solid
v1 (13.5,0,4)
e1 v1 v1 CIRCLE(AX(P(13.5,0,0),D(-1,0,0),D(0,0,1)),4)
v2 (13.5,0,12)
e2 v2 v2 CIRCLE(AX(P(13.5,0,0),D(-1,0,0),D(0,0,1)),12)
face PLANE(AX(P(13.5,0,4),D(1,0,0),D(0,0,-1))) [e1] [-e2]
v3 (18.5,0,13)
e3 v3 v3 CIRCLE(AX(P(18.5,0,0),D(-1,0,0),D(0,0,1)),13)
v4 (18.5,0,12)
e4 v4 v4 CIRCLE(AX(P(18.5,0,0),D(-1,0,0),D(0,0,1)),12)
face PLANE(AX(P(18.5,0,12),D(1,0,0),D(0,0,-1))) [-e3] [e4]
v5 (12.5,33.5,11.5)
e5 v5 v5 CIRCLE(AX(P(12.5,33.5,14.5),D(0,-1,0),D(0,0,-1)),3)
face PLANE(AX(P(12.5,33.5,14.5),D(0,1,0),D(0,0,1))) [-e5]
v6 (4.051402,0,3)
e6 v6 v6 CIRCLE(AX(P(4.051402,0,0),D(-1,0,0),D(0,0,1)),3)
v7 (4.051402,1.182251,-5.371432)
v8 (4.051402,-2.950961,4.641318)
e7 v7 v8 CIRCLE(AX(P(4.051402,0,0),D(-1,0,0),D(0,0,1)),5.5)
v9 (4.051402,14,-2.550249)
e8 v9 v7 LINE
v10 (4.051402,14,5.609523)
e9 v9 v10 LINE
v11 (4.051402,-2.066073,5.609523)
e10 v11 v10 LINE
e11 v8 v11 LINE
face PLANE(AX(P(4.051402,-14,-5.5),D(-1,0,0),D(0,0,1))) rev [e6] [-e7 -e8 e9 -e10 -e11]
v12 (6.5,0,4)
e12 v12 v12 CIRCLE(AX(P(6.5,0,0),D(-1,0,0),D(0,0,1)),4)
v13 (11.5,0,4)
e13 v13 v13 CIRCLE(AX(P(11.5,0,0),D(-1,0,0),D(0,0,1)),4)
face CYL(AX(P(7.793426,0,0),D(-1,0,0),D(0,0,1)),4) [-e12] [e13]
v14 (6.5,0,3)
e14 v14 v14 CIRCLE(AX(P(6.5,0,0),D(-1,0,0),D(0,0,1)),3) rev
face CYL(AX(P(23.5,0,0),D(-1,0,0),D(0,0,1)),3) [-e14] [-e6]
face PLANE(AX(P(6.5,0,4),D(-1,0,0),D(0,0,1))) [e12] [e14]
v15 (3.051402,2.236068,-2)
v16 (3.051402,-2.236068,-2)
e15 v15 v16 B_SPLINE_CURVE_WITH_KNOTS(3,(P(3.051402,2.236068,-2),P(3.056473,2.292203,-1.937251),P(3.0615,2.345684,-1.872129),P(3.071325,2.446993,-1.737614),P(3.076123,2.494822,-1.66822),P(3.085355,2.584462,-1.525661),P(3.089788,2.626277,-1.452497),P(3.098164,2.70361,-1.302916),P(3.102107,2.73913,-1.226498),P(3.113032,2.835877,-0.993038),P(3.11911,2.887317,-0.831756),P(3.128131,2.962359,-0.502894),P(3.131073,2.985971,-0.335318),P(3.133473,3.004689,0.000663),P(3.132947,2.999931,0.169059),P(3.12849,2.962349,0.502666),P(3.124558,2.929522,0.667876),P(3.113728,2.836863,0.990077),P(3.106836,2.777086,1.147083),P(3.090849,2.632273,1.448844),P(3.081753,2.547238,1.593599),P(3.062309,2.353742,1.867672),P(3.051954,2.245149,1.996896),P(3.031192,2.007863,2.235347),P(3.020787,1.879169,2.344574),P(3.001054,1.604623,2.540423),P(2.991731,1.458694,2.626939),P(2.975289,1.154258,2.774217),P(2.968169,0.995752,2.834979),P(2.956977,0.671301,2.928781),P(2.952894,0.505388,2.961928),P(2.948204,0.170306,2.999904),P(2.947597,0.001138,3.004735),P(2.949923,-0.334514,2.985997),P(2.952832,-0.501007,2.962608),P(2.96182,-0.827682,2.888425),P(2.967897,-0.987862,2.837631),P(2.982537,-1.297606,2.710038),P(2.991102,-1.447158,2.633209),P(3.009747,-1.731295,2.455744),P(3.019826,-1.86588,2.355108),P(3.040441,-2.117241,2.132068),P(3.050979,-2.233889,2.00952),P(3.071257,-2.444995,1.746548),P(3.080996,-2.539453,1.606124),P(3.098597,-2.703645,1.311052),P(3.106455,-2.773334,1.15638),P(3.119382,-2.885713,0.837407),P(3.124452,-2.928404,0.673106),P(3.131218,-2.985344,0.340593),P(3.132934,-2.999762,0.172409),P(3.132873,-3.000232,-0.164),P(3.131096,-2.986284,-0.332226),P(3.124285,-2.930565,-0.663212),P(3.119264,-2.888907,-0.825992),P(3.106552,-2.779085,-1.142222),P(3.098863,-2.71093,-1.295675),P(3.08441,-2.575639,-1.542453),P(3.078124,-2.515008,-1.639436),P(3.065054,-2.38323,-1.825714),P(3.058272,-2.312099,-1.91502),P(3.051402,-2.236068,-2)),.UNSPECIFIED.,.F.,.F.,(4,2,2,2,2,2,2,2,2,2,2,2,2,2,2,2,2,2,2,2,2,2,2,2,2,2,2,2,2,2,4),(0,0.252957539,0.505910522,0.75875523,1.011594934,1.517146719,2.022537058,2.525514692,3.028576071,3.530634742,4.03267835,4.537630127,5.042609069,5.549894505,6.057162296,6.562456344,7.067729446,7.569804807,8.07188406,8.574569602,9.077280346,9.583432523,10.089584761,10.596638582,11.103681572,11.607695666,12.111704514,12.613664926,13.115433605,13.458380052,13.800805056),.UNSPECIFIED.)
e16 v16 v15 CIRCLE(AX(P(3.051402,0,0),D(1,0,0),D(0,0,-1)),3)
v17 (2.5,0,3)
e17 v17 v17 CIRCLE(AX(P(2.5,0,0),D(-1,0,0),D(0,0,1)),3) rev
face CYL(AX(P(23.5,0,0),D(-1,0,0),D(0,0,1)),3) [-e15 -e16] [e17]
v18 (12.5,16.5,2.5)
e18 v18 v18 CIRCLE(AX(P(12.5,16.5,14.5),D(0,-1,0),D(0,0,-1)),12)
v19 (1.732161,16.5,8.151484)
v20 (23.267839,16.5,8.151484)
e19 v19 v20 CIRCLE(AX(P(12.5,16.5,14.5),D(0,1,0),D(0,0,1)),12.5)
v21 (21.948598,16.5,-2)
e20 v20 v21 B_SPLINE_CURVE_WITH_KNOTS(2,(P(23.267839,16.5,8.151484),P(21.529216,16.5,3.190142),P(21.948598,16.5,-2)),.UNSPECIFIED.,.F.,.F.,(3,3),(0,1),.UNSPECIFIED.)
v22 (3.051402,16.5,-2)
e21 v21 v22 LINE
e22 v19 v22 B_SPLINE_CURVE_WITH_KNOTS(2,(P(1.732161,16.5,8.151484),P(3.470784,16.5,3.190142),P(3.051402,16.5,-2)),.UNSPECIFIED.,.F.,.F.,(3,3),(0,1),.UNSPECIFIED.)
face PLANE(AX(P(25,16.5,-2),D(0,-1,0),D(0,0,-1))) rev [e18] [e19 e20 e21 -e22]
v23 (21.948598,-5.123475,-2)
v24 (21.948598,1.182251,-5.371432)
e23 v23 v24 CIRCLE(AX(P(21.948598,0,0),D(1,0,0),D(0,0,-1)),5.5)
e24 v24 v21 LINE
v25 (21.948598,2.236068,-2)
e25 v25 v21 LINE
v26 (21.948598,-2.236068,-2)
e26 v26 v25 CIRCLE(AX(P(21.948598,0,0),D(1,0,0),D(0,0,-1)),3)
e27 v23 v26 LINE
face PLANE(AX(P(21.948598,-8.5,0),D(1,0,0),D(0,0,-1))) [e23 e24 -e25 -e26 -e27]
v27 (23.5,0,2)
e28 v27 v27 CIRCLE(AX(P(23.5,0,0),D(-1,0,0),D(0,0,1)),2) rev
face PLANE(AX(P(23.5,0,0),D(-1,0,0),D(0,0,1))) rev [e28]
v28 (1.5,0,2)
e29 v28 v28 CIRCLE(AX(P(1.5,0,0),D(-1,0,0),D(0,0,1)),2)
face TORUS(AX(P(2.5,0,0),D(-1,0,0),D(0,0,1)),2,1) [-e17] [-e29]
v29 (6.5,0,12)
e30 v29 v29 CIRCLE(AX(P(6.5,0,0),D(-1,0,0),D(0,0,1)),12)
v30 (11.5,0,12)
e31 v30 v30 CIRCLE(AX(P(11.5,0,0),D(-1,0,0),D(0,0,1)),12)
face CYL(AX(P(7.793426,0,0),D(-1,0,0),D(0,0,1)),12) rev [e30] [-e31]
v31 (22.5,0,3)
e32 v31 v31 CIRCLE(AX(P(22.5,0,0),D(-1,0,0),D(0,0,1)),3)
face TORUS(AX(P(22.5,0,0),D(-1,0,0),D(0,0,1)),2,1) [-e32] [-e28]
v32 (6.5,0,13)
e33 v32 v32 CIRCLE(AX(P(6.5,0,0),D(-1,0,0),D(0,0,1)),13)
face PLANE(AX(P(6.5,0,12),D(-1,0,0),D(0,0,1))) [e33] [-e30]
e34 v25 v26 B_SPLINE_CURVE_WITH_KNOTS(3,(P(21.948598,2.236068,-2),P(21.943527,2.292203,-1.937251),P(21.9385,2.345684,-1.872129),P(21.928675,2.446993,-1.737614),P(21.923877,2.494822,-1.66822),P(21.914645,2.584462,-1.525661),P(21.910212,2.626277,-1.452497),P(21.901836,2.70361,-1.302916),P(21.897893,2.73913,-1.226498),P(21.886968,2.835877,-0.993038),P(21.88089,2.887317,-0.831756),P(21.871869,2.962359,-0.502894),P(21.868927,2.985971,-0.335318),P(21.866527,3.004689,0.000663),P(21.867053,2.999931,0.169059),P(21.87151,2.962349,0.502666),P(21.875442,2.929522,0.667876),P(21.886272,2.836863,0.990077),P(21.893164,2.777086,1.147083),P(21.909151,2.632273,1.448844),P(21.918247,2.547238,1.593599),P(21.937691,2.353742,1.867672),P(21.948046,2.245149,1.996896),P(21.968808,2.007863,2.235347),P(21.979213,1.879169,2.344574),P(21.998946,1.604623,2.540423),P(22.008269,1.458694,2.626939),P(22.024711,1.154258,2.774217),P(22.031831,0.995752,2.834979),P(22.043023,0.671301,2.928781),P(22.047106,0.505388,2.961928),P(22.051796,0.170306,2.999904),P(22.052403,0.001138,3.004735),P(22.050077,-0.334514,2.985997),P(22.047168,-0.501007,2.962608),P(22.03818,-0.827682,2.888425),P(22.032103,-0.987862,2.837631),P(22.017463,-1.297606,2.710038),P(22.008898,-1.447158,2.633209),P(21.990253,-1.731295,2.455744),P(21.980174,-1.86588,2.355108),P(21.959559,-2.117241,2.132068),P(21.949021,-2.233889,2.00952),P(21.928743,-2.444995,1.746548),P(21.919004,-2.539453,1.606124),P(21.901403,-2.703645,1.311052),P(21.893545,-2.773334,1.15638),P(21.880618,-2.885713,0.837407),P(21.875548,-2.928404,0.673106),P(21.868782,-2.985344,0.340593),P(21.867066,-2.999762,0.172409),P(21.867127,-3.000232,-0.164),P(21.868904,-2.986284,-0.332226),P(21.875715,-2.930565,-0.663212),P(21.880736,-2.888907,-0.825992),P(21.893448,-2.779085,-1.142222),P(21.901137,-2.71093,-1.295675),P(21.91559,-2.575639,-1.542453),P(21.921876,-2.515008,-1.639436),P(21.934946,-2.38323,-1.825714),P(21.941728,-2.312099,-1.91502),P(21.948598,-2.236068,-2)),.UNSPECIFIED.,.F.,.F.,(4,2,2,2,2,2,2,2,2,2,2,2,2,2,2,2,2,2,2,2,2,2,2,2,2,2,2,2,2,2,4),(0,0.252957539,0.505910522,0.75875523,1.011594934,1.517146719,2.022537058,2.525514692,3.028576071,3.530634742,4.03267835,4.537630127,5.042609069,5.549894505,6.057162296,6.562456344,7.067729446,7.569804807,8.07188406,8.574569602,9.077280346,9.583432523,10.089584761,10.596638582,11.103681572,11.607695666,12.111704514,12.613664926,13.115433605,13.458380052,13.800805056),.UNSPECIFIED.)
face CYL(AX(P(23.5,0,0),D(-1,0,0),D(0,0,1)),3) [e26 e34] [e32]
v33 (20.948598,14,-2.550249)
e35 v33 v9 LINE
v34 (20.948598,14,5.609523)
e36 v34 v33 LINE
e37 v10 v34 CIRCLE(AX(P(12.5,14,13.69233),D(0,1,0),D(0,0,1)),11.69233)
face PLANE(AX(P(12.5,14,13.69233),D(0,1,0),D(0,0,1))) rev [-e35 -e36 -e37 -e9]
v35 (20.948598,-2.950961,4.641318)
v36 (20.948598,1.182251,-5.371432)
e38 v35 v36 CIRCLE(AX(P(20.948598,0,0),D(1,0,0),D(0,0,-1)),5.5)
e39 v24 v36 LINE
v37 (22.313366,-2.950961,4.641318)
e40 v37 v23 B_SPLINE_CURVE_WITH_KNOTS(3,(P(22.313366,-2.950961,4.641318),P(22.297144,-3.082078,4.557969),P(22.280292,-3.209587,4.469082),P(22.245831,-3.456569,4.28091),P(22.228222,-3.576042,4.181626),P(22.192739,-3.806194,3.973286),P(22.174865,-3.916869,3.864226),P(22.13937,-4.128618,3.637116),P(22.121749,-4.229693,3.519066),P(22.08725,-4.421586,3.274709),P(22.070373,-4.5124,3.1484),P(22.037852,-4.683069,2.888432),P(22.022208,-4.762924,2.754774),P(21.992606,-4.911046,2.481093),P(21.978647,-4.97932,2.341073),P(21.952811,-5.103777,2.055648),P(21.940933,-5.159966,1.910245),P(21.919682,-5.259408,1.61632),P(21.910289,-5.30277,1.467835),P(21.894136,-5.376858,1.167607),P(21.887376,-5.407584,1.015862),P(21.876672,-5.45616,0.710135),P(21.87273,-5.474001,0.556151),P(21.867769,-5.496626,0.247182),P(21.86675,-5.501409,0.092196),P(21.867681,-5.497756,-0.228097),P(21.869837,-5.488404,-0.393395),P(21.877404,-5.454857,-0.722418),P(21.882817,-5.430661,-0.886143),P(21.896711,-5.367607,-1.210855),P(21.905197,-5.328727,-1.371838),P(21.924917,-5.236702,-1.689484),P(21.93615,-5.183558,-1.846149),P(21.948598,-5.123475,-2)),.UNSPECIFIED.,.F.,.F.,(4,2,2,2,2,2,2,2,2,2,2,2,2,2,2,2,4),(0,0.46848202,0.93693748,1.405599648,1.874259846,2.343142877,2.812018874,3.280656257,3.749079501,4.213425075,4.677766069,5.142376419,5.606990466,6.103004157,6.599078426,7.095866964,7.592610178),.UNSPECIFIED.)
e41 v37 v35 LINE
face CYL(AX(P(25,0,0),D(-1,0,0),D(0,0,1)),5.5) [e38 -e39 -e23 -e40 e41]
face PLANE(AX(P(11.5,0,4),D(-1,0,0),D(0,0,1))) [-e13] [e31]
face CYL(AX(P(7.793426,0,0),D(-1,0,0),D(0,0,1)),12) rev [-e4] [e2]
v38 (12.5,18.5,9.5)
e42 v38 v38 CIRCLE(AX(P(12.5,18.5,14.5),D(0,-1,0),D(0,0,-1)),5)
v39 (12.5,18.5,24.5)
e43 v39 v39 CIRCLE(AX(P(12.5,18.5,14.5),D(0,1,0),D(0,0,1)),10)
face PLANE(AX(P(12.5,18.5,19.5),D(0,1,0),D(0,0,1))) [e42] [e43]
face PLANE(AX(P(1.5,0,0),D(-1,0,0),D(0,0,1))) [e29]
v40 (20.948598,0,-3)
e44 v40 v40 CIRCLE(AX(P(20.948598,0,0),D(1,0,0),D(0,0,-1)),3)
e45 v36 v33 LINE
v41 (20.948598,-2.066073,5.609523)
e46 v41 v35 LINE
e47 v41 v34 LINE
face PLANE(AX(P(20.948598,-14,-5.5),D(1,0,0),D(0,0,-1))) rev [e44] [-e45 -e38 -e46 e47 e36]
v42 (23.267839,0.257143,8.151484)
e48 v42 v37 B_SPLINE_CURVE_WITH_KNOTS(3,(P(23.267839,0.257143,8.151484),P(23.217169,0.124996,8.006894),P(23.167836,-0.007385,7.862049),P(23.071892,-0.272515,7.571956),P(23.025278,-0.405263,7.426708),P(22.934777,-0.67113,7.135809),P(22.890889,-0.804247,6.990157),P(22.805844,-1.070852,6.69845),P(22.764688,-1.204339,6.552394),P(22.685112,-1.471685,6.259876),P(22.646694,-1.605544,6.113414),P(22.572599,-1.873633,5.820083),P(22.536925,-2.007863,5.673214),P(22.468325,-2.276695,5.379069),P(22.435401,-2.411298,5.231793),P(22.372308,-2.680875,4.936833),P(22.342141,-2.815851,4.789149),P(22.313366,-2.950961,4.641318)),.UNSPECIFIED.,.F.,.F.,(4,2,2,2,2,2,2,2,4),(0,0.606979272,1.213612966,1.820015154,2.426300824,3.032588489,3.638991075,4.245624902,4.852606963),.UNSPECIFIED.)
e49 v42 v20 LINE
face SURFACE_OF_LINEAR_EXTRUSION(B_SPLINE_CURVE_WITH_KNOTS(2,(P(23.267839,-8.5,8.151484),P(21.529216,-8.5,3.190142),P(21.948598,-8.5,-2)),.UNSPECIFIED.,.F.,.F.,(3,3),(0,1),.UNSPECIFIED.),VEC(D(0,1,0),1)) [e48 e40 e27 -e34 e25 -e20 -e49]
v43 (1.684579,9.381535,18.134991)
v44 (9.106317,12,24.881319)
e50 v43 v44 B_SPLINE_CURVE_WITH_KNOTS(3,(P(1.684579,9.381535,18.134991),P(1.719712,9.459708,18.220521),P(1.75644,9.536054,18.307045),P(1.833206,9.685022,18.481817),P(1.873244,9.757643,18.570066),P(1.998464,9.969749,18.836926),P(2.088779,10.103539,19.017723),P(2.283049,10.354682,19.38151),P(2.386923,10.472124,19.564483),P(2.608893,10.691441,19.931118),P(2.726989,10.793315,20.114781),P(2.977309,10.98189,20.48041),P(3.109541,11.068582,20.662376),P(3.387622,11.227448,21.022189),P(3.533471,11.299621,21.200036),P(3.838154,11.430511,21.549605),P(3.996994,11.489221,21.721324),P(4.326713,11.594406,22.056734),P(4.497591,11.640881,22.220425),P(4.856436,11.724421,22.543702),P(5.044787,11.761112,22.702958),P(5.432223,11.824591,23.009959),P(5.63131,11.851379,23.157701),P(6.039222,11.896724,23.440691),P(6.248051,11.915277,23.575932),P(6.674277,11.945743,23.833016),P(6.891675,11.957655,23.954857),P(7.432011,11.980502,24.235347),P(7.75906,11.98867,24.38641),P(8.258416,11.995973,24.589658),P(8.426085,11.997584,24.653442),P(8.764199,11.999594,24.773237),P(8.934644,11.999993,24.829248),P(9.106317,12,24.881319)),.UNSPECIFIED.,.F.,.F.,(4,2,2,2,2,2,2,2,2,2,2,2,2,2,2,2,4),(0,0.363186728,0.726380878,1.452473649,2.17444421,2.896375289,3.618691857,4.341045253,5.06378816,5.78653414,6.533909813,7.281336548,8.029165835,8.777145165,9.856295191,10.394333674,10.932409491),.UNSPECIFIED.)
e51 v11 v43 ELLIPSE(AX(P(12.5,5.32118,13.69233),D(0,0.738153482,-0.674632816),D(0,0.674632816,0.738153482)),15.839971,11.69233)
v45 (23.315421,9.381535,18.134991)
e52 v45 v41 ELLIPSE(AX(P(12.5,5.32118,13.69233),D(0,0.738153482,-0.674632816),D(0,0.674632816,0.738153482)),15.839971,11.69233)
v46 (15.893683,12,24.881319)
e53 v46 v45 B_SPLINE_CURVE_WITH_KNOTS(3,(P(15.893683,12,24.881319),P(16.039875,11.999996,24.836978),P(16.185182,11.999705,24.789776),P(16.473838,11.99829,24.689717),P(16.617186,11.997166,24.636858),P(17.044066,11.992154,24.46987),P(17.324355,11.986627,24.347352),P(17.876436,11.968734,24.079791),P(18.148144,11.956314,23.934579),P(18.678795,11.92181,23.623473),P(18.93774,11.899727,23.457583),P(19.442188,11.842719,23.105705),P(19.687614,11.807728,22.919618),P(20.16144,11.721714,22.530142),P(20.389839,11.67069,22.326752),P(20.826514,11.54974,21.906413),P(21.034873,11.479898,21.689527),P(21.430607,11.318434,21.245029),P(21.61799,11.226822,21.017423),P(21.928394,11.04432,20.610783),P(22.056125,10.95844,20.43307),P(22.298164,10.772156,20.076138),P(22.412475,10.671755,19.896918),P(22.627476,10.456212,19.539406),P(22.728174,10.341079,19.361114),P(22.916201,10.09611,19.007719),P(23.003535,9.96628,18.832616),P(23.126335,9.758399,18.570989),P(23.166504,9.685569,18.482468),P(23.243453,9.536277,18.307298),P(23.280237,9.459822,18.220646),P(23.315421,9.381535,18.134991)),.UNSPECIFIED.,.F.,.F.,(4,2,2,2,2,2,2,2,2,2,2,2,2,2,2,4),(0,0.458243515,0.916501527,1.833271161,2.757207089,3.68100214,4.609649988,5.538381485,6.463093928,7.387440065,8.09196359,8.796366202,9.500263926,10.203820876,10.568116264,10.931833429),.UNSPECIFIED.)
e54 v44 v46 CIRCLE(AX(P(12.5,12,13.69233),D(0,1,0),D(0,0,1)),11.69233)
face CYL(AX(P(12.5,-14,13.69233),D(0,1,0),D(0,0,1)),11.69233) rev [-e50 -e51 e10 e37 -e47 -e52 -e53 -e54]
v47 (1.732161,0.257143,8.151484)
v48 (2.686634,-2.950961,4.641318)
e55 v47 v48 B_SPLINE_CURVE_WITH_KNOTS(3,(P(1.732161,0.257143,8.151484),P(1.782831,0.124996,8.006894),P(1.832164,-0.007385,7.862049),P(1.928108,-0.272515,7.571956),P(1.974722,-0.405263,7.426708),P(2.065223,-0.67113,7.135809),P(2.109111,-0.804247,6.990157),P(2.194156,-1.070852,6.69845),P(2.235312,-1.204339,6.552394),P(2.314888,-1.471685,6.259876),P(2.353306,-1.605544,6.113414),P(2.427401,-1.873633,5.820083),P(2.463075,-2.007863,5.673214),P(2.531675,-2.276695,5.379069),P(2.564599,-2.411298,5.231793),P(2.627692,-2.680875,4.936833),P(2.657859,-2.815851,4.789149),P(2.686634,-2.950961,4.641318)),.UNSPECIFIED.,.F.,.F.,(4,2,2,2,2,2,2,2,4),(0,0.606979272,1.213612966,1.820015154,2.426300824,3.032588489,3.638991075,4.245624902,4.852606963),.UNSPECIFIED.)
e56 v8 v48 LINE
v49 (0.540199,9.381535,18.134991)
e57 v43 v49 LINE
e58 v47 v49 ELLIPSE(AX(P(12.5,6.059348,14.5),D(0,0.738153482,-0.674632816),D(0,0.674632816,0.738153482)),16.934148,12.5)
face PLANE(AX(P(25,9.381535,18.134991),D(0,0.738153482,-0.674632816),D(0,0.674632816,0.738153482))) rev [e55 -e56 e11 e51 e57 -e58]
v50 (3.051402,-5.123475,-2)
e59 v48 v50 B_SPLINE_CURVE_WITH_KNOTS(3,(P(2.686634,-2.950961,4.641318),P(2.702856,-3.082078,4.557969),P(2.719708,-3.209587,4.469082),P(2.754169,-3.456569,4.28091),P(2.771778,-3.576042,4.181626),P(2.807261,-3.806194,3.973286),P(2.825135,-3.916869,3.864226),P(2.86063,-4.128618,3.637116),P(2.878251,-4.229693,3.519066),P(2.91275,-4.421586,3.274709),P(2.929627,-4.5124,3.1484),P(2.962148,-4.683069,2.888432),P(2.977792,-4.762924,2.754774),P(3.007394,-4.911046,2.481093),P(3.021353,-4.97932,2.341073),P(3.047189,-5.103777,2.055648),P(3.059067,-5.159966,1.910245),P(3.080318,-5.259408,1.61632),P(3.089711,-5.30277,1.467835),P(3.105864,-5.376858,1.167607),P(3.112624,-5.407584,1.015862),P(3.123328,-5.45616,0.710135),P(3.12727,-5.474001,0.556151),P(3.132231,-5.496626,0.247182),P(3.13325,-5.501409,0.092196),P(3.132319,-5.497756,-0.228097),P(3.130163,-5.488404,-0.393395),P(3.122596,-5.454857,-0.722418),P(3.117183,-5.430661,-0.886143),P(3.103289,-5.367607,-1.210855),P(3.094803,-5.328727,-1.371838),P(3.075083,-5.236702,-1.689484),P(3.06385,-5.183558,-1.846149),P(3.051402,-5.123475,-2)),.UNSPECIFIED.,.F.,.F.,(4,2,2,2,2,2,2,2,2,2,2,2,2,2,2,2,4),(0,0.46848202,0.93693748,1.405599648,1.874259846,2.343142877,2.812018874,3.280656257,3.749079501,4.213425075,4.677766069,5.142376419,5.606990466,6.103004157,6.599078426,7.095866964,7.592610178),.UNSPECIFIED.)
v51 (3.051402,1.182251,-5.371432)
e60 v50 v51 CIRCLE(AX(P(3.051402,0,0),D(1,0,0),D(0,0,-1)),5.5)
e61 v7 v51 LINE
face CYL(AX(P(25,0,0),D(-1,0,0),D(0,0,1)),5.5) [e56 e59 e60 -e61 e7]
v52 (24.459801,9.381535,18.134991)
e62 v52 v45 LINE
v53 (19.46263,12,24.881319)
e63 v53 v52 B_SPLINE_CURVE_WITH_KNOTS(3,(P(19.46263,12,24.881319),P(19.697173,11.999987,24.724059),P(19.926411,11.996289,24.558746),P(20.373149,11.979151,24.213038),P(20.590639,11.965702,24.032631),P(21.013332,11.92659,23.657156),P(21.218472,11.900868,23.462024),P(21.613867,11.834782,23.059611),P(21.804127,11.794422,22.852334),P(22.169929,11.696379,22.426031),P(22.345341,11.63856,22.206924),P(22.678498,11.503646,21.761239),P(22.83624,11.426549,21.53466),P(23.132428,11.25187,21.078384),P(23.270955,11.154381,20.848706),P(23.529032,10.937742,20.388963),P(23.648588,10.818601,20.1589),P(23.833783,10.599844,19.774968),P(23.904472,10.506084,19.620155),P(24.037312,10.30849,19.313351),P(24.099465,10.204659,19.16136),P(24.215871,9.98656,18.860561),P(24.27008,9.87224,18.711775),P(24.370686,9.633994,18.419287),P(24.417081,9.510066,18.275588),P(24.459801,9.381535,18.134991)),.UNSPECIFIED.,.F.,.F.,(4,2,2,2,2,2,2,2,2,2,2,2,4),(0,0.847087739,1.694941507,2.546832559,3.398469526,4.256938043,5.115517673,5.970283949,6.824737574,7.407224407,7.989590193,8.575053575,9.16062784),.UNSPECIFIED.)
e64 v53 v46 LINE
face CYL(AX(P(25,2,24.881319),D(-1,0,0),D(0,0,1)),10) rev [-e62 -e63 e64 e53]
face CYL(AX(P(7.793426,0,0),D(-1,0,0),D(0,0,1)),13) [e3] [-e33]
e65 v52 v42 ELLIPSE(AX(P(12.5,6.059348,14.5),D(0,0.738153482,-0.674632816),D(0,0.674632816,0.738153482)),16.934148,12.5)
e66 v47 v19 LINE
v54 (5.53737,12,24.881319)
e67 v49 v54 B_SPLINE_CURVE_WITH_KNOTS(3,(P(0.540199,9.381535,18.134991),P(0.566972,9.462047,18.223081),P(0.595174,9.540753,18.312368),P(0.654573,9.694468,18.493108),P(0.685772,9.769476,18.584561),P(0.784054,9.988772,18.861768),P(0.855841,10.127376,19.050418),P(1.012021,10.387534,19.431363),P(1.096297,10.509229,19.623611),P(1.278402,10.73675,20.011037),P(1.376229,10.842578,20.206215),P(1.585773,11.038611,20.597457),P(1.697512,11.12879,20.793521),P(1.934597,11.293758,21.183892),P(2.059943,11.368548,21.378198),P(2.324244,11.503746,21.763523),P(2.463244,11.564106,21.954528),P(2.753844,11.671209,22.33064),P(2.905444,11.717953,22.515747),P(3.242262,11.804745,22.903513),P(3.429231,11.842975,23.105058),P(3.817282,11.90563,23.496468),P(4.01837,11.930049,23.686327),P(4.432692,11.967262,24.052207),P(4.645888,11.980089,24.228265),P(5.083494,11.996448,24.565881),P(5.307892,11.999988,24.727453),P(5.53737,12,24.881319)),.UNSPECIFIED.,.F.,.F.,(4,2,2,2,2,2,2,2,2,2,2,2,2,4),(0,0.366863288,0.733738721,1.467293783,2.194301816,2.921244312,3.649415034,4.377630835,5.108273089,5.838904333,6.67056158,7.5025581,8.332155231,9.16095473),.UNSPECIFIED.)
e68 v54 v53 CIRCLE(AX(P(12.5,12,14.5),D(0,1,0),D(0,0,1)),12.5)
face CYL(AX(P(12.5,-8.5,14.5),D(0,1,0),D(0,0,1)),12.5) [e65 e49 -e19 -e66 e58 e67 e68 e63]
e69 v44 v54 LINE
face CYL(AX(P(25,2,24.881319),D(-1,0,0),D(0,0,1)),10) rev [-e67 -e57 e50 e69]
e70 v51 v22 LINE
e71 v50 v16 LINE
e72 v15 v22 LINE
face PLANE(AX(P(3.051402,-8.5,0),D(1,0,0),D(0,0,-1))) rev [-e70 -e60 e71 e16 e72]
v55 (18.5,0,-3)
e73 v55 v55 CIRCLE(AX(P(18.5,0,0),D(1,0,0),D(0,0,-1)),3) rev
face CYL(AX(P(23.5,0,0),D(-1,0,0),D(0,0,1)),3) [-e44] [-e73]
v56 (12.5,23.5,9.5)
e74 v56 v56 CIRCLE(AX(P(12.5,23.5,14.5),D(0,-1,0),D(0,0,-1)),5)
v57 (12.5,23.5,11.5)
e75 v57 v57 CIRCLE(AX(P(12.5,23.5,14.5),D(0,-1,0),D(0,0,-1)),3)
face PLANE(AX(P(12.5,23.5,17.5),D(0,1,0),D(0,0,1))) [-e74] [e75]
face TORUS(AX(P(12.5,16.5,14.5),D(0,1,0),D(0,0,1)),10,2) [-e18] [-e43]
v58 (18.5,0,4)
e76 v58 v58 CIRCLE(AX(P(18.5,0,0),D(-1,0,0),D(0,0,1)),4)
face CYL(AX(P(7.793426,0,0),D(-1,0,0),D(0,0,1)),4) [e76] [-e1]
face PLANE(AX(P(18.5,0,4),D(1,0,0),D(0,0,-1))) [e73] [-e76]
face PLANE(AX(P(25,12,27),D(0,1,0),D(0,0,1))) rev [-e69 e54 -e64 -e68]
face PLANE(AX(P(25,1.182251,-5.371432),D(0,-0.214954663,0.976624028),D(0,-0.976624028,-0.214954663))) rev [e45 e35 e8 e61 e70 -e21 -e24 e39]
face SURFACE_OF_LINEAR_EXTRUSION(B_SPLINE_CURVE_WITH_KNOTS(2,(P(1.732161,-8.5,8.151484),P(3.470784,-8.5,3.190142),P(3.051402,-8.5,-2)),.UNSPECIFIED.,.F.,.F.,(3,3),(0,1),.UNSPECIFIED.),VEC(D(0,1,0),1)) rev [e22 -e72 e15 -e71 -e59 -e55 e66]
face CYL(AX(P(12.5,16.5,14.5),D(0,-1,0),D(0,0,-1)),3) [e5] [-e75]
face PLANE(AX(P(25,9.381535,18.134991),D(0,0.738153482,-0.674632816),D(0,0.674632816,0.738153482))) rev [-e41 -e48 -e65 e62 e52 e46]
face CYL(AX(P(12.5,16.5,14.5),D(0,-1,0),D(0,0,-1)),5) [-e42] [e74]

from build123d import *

# Parameters (mm, degrees)
BASE_DEPTH             = 25
ESQUISSE2_W            = 3.051401781
ESQUISSE2_H            = 3.671186171
VIDE_BASE_DEPTH        = 25
CONG_2_R               = 2
VIDE_BASE_2_DEPTH      = 14
VIDE_BASE_2_DEPTH_BACK = 14
AXE_ROUE_DEPTH         = 11
AXE_ROUE_DEPTH_BACK    = 11
ESQUISSE7_R            = 3
CONGE_VIS_1_R          = 1
CONGE_VIS_2_R          = 1


with BuildPart() as part:
    # Esquisse1 → BASE (new body)
    with BuildSketch(Plane(origin=(0, 0, 0), x_dir=(0, 0, -1), z_dir=(1, 0, 0))):
        with BuildLine():
            Line((5.371432156, 1.182250648), (2, 16.5))
            Line((2, 16.5), (-27, 16.5))
            Line((-27, 16.5), (-27, 12))
            Line((-27, 12), (-24.881319015, 12))
            ThreePointArc((-24.881319015, 12), (-21.262987094, 11.322428552), (-18.134990853, 9.381534822))
            Line((-18.134990853, 9.381534822), (-4.641317523, -2.950961141))
            ThreePointArc((-4.641317523, -2.950961141), (2.098601145, -5.083883676), (5.371432156, 1.182250648))
        make_face()
    extrude(amount=BASE_DEPTH)

    # Esquisse2 → VIDE BASE (cut)
    with BuildSketch(Plane(origin=(0, 16.5, 0), x_dir=(1, 0, 0), z_dir=(0, 1, 0))):
        with BuildLine():
            Line((25, 2), (21.948598219, 2))
            add(Edge.make_bspline(
                [(23.267838517, -8.151484137), (21.529216313, -3.190142242), (21.948598219, 2)],
                knots=[0, 0, 0, 1, 1, 1], degree=2))
            ThreePointArc((23.267838517, -8.151484137), (24.559186985, -11.209709851), (25, -14.5))
            Line((25, -14.5), (25, 2))
        make_face()
        with Locations((23.47429911, 3.835593086)):
            Rectangle(ESQUISSE2_W, ESQUISSE2_H)
        with Locations((1.525700891, 3.835593086)):
            Rectangle(ESQUISSE2_W, ESQUISSE2_H)
        with BuildLine():
            add(Edge.make_bspline(
                [(1.732161483, -8.151484137), (3.470783687, -3.190142242), (3.051401781, 2)],
                knots=[0, 0, 0, 1, 1, 1], degree=2))
            Line((3.051401781, 2), (0, 2))
            Line((0, 2), (0, -14.49999997))
            ThreePointArc((0, -14.49999997), (0.440813019, -11.209709836), (1.732161483, -8.151484137))
        make_face()
        with BuildLine():
            Line((0, -27), (12.5, -27))
            ThreePointArc((12.5, -27), (3.661165225, -23.338834754), (0, -14.49999997))
            Line((0, -14.49999997), (0, -27))
        make_face()
        with BuildLine():
            Line((25, -27), (25, -14.5))
            ThreePointArc((25, -14.5), (21.338834765, -23.338834765), (12.5, -27))
            Line((12.5, -27), (25, -27))
        make_face()
    extrude(amount=-VIDE_BASE_DEPTH, mode=Mode.SUBTRACT)

    # Esquisse4 → VIS (revolve)
    with BuildSketch(Plane.ZY.offset(-12.5), mode=Mode.PRIVATE) as vis_sk:
        Polygon((14.5, 16.5), (14.5, 33.5), (17.5, 33.5), (17.5, 23.5), (19.5, 23.5), (19.5, 18.5), (26.5, 18.5), (26.5, 16.5), align=None)
    revolve(vis_sk.sketch.rotate(Axis((12.5, 16.5, 14.5), (0, 1, 0)), 180), axis=Axis((12.5, 16.5, 14.5), (0, 1, 0)))

    # Congé2
    cong_2_edges = [part.edges().sort_by_distance(p)[0] for p in [
        (12.5, 18.5, 26.5),
    ]]
    fillet(cong_2_edges, radius=CONG_2_R - 0.0001)  # a hair under: the kernel refuses the full size

    # Esquisse6 → VIDE BASE 2 (cut, two sides: drawn at the far end of the back side and taken through both)
    with BuildSketch(Plane(origin=(0, 0, 0), x_dir=(1, 0, 0), z_dir=(0, 1, 0)).offset(-VIDE_BASE_2_DEPTH_BACK)):
        with BuildLine():
            Line((4.051401781, 5.5), (4.051401781, -5.609523223))
            ThreePointArc((4.051401781, -5.609523223), (12.5, -25.384659014), (20.948598219, -5.609523223))
            Line((20.948598219, -5.609523223), (20.948598219, 5.5))
            Line((20.948598219, 5.5), (4.051401781, 5.5))
        make_face()
    extrude(amount=VIDE_BASE_2_DEPTH + VIDE_BASE_2_DEPTH_BACK, mode=Mode.SUBTRACT)

    # Esquisse7 → AXE ROUE (add, two sides: drawn at the far end of the back side and taken through both)
    with BuildSketch(Plane.ZY.offset(-12.5).offset(-AXE_ROUE_DEPTH_BACK)):
        Circle(ESQUISSE7_R)
    extrude(amount=AXE_ROUE_DEPTH + AXE_ROUE_DEPTH_BACK)

    # CONGE VIS 1
    conge_vis_1_edges = [part.edges().sort_by_distance(p)[0] for p in [
        (23.5, 0, -3),
    ]]
    fillet(conge_vis_1_edges, radius=CONGE_VIS_1_R)

    # CONGE VIS 2
    conge_vis_2_edges = [part.edges().sort_by_distance(p)[0] for p in [
        (1.5, 0, -3),
    ]]
    fillet(conge_vis_2_edges, radius=CONGE_VIS_2_R)

    # Esquisse9 → ROUE (revolve)
    with BuildSketch(Plane(origin=(0, 0, 0), x_dir=(1, 0, 0), z_dir=(0, 1, 0))):
        Polygon((18.5, -4), (18.5, -3), (6.5, -3), (6.5, -4), (11.5, -4), (11.5, -12), (6.5, -12), (6.5, -13), (18.5, -13), (18.5, -12), (13.5, -12), (13.5, -4), align=None)
    revolve(axis=Axis((7.793426375, 0, 0), (1, 0, 0)))


solid = part.part
